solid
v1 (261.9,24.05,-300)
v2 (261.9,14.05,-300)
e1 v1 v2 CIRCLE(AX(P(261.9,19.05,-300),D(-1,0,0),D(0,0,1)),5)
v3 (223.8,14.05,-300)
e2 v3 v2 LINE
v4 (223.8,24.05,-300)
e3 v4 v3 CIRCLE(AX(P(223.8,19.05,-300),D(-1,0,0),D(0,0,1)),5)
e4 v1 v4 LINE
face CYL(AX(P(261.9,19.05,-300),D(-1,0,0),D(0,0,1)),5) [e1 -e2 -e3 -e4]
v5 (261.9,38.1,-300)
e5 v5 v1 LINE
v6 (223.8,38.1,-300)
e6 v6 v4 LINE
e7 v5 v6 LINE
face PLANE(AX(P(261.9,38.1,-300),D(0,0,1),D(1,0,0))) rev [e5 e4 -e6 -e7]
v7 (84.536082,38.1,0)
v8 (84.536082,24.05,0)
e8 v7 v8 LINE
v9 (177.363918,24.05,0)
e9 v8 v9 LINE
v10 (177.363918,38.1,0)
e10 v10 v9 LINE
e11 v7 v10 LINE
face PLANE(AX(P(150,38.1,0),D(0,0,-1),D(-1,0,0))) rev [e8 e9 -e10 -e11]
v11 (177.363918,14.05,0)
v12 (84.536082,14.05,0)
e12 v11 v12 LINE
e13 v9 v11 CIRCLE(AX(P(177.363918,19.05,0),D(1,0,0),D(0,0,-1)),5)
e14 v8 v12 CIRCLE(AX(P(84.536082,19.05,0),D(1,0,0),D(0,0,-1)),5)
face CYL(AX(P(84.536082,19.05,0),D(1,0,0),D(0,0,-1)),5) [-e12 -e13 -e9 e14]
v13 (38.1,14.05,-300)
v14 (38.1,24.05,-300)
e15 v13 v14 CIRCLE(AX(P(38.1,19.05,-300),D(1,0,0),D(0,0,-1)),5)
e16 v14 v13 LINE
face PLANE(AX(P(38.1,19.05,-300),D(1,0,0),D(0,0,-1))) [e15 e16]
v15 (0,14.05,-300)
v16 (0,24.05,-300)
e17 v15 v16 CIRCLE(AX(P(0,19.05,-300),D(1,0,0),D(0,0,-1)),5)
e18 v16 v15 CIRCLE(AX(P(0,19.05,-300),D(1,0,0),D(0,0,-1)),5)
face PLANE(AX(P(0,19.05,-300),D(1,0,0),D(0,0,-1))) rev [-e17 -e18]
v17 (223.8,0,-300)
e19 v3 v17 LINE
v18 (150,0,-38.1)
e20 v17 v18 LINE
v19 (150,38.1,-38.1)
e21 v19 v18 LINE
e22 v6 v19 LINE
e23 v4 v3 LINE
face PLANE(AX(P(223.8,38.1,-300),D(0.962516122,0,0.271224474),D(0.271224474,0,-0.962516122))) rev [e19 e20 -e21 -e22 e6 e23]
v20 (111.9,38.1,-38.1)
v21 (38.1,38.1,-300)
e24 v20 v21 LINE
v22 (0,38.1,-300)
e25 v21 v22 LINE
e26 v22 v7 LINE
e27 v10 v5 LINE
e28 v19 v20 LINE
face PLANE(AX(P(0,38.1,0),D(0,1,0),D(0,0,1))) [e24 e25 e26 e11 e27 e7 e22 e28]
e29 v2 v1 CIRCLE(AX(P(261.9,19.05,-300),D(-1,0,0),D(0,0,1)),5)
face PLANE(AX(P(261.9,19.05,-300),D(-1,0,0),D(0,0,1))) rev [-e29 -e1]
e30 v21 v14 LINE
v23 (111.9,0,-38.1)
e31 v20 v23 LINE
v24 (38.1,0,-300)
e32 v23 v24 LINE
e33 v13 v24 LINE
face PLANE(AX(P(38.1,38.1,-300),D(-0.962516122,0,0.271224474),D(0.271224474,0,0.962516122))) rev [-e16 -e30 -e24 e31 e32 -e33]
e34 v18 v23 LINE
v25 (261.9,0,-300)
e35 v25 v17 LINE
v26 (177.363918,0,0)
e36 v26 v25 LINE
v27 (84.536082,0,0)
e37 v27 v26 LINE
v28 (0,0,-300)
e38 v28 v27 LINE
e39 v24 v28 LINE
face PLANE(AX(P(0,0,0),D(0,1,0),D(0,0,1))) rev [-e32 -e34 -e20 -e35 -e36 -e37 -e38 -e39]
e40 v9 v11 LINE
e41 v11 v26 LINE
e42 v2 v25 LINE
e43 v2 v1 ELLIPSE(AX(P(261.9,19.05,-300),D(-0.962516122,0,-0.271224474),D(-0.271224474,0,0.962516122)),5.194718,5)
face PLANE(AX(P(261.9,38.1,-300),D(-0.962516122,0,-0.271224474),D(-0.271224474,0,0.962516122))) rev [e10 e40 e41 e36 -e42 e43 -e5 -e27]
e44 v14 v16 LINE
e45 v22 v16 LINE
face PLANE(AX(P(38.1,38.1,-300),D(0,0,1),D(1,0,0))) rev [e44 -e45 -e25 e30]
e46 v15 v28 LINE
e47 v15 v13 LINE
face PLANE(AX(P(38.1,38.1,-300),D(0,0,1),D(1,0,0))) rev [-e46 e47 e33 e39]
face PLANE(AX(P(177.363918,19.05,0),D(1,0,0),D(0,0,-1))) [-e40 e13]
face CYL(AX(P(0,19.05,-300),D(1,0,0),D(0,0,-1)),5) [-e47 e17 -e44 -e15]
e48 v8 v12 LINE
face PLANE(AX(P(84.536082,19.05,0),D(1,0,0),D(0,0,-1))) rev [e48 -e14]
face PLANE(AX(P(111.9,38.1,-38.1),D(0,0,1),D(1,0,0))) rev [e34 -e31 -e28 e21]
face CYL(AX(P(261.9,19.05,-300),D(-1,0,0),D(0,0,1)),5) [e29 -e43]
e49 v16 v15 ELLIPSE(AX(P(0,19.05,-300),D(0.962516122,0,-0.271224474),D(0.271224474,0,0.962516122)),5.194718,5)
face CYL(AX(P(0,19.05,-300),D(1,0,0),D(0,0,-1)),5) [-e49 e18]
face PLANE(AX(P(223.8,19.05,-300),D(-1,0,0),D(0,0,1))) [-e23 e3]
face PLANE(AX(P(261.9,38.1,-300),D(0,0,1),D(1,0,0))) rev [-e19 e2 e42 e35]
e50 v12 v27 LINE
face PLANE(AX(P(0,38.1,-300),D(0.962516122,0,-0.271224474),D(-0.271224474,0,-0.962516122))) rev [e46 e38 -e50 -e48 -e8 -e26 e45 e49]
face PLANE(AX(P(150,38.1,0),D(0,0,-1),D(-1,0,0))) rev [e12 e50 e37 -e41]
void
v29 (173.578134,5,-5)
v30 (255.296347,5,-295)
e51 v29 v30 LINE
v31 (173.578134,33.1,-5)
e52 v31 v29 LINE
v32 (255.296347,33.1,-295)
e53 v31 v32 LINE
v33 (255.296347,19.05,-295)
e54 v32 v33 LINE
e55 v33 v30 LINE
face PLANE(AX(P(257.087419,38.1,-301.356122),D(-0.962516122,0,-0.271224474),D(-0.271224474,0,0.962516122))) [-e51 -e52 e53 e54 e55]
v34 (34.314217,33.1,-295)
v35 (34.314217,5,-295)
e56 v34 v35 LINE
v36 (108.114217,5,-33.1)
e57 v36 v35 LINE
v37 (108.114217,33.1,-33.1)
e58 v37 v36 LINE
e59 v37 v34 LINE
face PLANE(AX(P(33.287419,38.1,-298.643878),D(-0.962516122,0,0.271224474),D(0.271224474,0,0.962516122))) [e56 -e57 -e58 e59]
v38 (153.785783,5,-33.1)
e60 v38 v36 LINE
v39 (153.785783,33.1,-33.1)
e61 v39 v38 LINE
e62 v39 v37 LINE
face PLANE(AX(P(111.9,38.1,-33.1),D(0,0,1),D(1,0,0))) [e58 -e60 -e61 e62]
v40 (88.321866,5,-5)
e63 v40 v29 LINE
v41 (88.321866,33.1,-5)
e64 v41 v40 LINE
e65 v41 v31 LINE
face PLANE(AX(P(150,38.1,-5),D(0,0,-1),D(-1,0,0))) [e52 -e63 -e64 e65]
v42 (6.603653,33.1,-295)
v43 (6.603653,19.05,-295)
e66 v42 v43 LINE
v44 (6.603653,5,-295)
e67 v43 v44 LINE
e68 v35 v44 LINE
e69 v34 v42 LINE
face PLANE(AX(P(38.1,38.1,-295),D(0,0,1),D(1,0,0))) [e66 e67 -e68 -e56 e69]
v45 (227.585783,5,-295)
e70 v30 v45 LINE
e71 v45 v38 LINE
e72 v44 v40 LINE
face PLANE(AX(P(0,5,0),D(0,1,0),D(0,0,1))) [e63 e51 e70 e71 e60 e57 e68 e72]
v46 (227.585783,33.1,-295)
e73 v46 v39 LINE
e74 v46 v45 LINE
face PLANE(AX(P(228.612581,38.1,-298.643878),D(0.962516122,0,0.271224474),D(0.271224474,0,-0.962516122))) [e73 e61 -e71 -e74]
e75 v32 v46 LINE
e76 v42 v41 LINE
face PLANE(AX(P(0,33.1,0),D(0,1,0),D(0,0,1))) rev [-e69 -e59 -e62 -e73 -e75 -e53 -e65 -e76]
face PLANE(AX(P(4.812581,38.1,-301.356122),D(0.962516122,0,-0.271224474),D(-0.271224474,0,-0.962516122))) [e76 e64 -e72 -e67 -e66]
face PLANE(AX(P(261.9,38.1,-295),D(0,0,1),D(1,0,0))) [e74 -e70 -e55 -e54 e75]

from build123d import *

# Parameters (mm, degrees)
BOSS_EXTRUDE1_DEPTH = 38.1
SWEEP1_PROFILE_R    = 5
SWEEP2_PROFILE_R    = 5
SWEEP4_PROFILE_R    = 5
SHELL4_START        = 5
SHELL4_DEPTH        = 28.1


# Read off the part's stored shape, not the designer's step: Shell4
with BuildPart() as part:
    # Sketch1 → Boss-Extrude1 (new body)
    with BuildSketch(Plane(origin=(0, 0, 0), x_dir=(1, 0, 0), z_dir=(0, 1, 0))):
        Polygon((111.9, 0), (150, 0), (177.363917526, 0), (261.9, 300), (223.8, 300), (150, 38.1), (111.9, 38.1), (38.1, 300), (0, 300), (84.536082474, 0), align=None)
    extrude(amount=BOSS_EXTRUDE1_DEPTH)

    # Sweep1: sweep along a path in Sketch2
    with BuildLine(Plane.XY) as sweep1_path:
        Line((84.536082474, 19.05), (177.363917526, 19.05))
    # Sweep1 profile (on start of the path) → Sweep1 (sweep)
    with BuildSketch(Plane(origin=(84.536082474, 19.05, 0), x_dir=(0, 0, 1), z_dir=(1, 0, 0))):
        Circle(SWEEP1_PROFILE_R)
    sweep(path=sweep1_path.line)

    # Sweep2: sweep along a path in Sketch11
    with BuildLine(Plane(origin=(0, 0, -300), x_dir=(-1, 0, 0), z_dir=(0, 0, -1))) as sweep2_path:
        Line((0, 19.05), (-38.1, 19.05))
    # Sweep2 profile (on start of the path) → Sweep2 (sweep)
    with BuildSketch(Plane(origin=(0, 19.05, -300), x_dir=(0, 0, 1), z_dir=(1, 0, 0))):
        Circle(SWEEP2_PROFILE_R)
    sweep(path=sweep2_path.line)

    # Sweep4: sweep along a path in Sketch16
    with BuildLine(Plane(origin=(0, 0, -300), x_dir=(-1, 0, 0), z_dir=(0, 0, -1))) as sweep4_path:
        Line((-261.9, 19.05), (-223.8, 19.05))
    # Sweep4 profile (on start of the path) → Sweep4 (sweep)
    with BuildSketch(Plane(origin=(261.9, 19.05, -300), x_dir=(0, 0, -1), z_dir=(-1, 0, 0))):
        Circle(SWEEP4_PROFILE_R)
    sweep(path=sweep4_path.line)

    # Shell4 outline → Shell4 (cut)
    with BuildSketch(Plane(origin=(0, 0, 0), x_dir=(1, 0, 0), z_dir=(0, 1, 0)).offset(SHELL4_START)):
        Polygon((255.296347108, 295), (227.585783476, 295), (153.785783476, 33.1), (108.114216524, 33.1), (34.314216524, 295), (6.603652892, 295), (88.32186595, 5), (173.57813405, 5), align=None)
    extrude(amount=SHELL4_DEPTH, mode=Mode.SUBTRACT)


solid = part.part
